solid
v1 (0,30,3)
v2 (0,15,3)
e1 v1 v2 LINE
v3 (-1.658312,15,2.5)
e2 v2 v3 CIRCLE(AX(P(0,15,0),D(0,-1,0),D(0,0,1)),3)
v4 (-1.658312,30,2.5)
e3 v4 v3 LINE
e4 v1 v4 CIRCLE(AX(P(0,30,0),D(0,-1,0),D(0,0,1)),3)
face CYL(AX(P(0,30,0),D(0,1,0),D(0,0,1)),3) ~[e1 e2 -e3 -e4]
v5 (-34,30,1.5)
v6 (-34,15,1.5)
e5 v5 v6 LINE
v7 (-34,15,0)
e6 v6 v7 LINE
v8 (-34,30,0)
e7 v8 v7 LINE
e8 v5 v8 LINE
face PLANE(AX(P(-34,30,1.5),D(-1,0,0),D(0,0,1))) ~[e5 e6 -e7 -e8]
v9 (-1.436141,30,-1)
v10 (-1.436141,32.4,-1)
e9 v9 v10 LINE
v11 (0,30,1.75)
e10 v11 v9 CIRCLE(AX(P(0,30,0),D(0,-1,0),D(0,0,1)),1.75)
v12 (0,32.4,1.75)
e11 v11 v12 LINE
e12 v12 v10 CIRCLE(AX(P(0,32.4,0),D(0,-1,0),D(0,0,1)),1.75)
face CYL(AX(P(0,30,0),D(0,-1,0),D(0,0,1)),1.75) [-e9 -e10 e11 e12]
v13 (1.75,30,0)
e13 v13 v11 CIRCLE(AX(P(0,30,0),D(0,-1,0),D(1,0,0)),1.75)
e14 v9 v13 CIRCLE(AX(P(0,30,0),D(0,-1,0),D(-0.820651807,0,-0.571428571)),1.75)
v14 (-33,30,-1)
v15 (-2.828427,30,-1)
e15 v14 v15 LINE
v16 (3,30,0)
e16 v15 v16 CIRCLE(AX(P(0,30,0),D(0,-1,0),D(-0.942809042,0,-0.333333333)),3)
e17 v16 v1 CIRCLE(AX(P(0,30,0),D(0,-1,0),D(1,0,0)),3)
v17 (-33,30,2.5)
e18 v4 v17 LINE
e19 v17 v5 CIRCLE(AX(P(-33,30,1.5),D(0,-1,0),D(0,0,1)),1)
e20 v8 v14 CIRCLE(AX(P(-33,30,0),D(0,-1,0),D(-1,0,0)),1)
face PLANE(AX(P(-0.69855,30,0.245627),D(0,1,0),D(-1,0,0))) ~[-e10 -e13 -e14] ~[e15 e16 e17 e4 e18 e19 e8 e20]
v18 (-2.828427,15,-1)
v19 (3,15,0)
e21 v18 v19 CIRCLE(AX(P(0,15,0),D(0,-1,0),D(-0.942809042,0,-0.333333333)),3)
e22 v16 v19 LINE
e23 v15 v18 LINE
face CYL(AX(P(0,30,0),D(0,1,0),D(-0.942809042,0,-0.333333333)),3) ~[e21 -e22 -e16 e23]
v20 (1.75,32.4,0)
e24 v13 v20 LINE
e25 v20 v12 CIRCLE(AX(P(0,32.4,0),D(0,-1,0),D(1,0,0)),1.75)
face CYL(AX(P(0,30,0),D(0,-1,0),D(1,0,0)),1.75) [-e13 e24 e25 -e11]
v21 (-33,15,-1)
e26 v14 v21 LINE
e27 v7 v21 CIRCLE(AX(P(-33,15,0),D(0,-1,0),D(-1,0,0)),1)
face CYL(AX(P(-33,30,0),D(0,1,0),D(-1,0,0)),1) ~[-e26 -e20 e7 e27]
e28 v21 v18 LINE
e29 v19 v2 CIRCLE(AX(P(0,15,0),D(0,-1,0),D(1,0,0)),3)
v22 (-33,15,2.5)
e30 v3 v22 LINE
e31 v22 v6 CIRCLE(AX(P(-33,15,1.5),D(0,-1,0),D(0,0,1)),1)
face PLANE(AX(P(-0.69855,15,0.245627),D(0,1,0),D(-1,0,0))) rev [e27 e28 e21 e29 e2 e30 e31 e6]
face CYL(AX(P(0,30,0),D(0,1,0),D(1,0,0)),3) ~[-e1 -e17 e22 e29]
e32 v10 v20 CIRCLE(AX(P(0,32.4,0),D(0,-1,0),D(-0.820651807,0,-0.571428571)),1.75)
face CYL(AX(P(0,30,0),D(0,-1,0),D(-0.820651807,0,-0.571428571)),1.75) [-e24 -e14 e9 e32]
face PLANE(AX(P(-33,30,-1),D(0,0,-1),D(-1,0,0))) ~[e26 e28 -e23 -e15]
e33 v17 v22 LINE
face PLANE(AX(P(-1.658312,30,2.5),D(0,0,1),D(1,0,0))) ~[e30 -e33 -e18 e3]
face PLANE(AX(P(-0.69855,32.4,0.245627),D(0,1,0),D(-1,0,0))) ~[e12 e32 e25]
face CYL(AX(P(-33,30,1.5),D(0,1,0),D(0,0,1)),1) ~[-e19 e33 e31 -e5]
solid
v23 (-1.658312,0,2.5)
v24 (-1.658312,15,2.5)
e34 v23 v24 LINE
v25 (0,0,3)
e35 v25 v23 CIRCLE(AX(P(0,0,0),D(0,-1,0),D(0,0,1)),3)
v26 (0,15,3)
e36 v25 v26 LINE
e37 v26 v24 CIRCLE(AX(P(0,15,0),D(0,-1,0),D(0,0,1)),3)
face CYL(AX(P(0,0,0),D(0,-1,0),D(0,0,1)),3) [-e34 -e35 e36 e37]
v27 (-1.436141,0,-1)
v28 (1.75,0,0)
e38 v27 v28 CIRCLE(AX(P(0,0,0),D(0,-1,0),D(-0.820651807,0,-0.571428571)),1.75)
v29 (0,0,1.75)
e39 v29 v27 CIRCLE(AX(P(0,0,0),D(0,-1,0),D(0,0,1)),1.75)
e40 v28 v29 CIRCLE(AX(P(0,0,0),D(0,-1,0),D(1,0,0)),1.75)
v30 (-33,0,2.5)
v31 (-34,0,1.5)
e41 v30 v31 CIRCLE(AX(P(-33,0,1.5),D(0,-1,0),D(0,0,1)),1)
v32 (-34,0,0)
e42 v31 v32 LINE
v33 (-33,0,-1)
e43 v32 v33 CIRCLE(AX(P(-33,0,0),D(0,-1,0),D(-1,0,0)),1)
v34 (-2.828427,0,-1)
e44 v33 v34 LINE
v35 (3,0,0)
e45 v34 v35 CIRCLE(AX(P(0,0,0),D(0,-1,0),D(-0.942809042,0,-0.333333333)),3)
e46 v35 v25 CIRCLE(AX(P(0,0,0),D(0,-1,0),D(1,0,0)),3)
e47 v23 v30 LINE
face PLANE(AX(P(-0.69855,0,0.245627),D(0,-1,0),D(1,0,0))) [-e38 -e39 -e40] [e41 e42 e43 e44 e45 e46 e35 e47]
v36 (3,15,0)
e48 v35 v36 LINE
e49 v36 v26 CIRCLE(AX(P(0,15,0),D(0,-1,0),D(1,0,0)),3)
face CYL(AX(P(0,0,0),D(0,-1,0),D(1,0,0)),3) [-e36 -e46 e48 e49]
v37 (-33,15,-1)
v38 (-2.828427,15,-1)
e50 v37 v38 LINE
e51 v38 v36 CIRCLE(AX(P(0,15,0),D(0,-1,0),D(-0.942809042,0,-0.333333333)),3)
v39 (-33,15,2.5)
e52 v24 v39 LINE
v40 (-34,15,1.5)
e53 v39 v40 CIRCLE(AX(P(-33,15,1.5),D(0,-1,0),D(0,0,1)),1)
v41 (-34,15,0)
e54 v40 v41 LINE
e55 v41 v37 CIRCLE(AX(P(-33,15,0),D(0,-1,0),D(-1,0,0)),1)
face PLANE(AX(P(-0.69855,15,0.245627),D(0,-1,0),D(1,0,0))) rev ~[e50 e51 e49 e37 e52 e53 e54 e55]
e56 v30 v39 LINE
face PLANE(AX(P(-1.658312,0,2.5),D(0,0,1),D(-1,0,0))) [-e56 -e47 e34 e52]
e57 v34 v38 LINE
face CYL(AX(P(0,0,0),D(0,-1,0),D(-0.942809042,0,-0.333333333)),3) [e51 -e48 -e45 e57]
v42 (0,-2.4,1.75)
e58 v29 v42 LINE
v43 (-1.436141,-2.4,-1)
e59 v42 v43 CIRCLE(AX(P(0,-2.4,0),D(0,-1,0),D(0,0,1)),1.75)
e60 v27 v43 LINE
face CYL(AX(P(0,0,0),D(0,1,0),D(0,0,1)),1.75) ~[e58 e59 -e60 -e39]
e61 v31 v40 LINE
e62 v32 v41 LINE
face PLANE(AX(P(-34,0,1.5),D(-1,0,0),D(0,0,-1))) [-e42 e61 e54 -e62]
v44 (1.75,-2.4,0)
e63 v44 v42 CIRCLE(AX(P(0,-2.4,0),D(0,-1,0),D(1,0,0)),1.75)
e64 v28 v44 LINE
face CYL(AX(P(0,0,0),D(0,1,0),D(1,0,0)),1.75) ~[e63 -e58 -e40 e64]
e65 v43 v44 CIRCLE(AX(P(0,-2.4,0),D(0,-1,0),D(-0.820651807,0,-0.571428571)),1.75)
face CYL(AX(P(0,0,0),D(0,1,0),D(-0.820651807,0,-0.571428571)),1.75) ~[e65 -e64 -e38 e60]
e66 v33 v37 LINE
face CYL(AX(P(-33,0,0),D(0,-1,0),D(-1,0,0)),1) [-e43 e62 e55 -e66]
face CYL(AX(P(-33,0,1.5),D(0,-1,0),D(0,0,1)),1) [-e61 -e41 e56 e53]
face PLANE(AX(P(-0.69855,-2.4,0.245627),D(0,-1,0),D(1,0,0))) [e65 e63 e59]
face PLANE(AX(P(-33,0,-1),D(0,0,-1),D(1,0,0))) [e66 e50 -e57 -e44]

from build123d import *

# Parameters (mm, degrees)
F1_DEPTH = 2.4
F2_DEPTH = 15


with BuildPart() as f1:
    # F0 (on Front) → F1 (new body)
    with BuildSketch(Plane.XZ):
        with BuildLine():
            Line((0, -1), (0, 0))
            Line((0, 0), (0, 1.75))
            ThreePointArc((0, 1.75), (-1.5512092057, 0.8100925873), (-1.4361406616, -1))
            Line((-1.4361406616, -1), (0, -1))
        make_face()
        with BuildLine():
            Line((0, 1.75), (0, 0))
            Line((0, 0), (0, -1))
            Line((0, -1), (-1.4361406616, -1))
            ThreePointArc((-1.4361406616, -1), (0.5240485866, -1.6696925103), (1.75, 0))
            ThreePointArc((1.75, 0), (1.2374368671, 1.2374368671), (0, 1.75))
        make_face()
    extrude(amount=F1_DEPTH)

    # F0 (on Front) → F2 (join)
    with BuildSketch(Plane.XZ):
        with BuildLine():
            Line((0, -1), (0, 0))
            Line((0, 0), (0, 1.75))
            ThreePointArc((0, 1.75), (-1.5512092057, 0.8100925873), (-1.4361406616, -1))
            Line((-1.4361406616, -1), (0, -1))
        make_face()
        with BuildLine():
            Line((0, 1.75), (0, 0))
            Line((0, 0), (0, -1))
            Line((0, -1), (-1.4361406616, -1))
            ThreePointArc((-1.4361406616, -1), (0.5240485866, -1.6696925103), (1.75, 0))
            ThreePointArc((1.75, 0), (1.2374368671, 1.2374368671), (0, 1.75))
        make_face()
        with BuildLine():
            ThreePointArc((-1.4361406616, -1), (-1.5512092057, 0.8100925873), (0, 1.75))
            Line((0, 1.75), (0, 2.5))
            Line((0, 2.5), (-1.6583123952, 2.5))
            ThreePointArc((-1.6583123952, 2.5), (-2.8452078799, 0.951205614), (-2.8284271247, -1))
            Line((-2.8284271247, -1), (-1.4361406616, -1))
        make_face()
        with BuildLine():
            Line((0, 2.5), (0, 1.75))
            ThreePointArc((0, 1.75), (1.2374368671, 1.2374368671), (1.75, 0))
            ThreePointArc((1.75, 0), (0.5240485866, -1.6696925103), (-1.4361406616, -1))
            Line((-1.4361406616, -1), (-2.8284271247, -1))
            ThreePointArc((-2.8284271247, -1), (0.5073059362, -2.956795679), (3, 0))
            ThreePointArc((3, 0), (2.1213203436, 2.1213203436), (0, 3))
            Line((0, 3), (0, 2.5))
        make_face()
        with BuildLine():
            Line((-1.6583123952, 2.5), (0, 2.5))
            Line((0, 2.5), (0, 3))
            ThreePointArc((0, 3), (-0.8660254038, 2.8722813233), (-1.6583123952, 2.5))
        make_face()
        with BuildLine():
            ThreePointArc((-2.8284271247, -1), (-2.8452078799, 0.951205614), (-1.6583123952, 2.5))
            Line((-1.6583123952, 2.5), (-33, 2.5))
            ThreePointArc((-33, 2.5), (-33.7071067812, 2.2071067812), (-34, 1.5))
            Line((-34, 1.5), (-34, 0))
            ThreePointArc((-34, 0), (-33.7071067812, -0.7071067812), (-33, -1))
            Line((-33, -1), (-2.8284271247, -1))
        make_face()
    extrude(amount=-F2_DEPTH)


with BuildPart() as f3_1:
    # F3: instance of F1
    add(f1.part.mirror(Plane(origin=(-14.523910756, 15, 0.6034083125), x_dir=(1, 0, 0), z_dir=(0, 1, 0))))


solid = Compound([f1.part, f3_1.part])
